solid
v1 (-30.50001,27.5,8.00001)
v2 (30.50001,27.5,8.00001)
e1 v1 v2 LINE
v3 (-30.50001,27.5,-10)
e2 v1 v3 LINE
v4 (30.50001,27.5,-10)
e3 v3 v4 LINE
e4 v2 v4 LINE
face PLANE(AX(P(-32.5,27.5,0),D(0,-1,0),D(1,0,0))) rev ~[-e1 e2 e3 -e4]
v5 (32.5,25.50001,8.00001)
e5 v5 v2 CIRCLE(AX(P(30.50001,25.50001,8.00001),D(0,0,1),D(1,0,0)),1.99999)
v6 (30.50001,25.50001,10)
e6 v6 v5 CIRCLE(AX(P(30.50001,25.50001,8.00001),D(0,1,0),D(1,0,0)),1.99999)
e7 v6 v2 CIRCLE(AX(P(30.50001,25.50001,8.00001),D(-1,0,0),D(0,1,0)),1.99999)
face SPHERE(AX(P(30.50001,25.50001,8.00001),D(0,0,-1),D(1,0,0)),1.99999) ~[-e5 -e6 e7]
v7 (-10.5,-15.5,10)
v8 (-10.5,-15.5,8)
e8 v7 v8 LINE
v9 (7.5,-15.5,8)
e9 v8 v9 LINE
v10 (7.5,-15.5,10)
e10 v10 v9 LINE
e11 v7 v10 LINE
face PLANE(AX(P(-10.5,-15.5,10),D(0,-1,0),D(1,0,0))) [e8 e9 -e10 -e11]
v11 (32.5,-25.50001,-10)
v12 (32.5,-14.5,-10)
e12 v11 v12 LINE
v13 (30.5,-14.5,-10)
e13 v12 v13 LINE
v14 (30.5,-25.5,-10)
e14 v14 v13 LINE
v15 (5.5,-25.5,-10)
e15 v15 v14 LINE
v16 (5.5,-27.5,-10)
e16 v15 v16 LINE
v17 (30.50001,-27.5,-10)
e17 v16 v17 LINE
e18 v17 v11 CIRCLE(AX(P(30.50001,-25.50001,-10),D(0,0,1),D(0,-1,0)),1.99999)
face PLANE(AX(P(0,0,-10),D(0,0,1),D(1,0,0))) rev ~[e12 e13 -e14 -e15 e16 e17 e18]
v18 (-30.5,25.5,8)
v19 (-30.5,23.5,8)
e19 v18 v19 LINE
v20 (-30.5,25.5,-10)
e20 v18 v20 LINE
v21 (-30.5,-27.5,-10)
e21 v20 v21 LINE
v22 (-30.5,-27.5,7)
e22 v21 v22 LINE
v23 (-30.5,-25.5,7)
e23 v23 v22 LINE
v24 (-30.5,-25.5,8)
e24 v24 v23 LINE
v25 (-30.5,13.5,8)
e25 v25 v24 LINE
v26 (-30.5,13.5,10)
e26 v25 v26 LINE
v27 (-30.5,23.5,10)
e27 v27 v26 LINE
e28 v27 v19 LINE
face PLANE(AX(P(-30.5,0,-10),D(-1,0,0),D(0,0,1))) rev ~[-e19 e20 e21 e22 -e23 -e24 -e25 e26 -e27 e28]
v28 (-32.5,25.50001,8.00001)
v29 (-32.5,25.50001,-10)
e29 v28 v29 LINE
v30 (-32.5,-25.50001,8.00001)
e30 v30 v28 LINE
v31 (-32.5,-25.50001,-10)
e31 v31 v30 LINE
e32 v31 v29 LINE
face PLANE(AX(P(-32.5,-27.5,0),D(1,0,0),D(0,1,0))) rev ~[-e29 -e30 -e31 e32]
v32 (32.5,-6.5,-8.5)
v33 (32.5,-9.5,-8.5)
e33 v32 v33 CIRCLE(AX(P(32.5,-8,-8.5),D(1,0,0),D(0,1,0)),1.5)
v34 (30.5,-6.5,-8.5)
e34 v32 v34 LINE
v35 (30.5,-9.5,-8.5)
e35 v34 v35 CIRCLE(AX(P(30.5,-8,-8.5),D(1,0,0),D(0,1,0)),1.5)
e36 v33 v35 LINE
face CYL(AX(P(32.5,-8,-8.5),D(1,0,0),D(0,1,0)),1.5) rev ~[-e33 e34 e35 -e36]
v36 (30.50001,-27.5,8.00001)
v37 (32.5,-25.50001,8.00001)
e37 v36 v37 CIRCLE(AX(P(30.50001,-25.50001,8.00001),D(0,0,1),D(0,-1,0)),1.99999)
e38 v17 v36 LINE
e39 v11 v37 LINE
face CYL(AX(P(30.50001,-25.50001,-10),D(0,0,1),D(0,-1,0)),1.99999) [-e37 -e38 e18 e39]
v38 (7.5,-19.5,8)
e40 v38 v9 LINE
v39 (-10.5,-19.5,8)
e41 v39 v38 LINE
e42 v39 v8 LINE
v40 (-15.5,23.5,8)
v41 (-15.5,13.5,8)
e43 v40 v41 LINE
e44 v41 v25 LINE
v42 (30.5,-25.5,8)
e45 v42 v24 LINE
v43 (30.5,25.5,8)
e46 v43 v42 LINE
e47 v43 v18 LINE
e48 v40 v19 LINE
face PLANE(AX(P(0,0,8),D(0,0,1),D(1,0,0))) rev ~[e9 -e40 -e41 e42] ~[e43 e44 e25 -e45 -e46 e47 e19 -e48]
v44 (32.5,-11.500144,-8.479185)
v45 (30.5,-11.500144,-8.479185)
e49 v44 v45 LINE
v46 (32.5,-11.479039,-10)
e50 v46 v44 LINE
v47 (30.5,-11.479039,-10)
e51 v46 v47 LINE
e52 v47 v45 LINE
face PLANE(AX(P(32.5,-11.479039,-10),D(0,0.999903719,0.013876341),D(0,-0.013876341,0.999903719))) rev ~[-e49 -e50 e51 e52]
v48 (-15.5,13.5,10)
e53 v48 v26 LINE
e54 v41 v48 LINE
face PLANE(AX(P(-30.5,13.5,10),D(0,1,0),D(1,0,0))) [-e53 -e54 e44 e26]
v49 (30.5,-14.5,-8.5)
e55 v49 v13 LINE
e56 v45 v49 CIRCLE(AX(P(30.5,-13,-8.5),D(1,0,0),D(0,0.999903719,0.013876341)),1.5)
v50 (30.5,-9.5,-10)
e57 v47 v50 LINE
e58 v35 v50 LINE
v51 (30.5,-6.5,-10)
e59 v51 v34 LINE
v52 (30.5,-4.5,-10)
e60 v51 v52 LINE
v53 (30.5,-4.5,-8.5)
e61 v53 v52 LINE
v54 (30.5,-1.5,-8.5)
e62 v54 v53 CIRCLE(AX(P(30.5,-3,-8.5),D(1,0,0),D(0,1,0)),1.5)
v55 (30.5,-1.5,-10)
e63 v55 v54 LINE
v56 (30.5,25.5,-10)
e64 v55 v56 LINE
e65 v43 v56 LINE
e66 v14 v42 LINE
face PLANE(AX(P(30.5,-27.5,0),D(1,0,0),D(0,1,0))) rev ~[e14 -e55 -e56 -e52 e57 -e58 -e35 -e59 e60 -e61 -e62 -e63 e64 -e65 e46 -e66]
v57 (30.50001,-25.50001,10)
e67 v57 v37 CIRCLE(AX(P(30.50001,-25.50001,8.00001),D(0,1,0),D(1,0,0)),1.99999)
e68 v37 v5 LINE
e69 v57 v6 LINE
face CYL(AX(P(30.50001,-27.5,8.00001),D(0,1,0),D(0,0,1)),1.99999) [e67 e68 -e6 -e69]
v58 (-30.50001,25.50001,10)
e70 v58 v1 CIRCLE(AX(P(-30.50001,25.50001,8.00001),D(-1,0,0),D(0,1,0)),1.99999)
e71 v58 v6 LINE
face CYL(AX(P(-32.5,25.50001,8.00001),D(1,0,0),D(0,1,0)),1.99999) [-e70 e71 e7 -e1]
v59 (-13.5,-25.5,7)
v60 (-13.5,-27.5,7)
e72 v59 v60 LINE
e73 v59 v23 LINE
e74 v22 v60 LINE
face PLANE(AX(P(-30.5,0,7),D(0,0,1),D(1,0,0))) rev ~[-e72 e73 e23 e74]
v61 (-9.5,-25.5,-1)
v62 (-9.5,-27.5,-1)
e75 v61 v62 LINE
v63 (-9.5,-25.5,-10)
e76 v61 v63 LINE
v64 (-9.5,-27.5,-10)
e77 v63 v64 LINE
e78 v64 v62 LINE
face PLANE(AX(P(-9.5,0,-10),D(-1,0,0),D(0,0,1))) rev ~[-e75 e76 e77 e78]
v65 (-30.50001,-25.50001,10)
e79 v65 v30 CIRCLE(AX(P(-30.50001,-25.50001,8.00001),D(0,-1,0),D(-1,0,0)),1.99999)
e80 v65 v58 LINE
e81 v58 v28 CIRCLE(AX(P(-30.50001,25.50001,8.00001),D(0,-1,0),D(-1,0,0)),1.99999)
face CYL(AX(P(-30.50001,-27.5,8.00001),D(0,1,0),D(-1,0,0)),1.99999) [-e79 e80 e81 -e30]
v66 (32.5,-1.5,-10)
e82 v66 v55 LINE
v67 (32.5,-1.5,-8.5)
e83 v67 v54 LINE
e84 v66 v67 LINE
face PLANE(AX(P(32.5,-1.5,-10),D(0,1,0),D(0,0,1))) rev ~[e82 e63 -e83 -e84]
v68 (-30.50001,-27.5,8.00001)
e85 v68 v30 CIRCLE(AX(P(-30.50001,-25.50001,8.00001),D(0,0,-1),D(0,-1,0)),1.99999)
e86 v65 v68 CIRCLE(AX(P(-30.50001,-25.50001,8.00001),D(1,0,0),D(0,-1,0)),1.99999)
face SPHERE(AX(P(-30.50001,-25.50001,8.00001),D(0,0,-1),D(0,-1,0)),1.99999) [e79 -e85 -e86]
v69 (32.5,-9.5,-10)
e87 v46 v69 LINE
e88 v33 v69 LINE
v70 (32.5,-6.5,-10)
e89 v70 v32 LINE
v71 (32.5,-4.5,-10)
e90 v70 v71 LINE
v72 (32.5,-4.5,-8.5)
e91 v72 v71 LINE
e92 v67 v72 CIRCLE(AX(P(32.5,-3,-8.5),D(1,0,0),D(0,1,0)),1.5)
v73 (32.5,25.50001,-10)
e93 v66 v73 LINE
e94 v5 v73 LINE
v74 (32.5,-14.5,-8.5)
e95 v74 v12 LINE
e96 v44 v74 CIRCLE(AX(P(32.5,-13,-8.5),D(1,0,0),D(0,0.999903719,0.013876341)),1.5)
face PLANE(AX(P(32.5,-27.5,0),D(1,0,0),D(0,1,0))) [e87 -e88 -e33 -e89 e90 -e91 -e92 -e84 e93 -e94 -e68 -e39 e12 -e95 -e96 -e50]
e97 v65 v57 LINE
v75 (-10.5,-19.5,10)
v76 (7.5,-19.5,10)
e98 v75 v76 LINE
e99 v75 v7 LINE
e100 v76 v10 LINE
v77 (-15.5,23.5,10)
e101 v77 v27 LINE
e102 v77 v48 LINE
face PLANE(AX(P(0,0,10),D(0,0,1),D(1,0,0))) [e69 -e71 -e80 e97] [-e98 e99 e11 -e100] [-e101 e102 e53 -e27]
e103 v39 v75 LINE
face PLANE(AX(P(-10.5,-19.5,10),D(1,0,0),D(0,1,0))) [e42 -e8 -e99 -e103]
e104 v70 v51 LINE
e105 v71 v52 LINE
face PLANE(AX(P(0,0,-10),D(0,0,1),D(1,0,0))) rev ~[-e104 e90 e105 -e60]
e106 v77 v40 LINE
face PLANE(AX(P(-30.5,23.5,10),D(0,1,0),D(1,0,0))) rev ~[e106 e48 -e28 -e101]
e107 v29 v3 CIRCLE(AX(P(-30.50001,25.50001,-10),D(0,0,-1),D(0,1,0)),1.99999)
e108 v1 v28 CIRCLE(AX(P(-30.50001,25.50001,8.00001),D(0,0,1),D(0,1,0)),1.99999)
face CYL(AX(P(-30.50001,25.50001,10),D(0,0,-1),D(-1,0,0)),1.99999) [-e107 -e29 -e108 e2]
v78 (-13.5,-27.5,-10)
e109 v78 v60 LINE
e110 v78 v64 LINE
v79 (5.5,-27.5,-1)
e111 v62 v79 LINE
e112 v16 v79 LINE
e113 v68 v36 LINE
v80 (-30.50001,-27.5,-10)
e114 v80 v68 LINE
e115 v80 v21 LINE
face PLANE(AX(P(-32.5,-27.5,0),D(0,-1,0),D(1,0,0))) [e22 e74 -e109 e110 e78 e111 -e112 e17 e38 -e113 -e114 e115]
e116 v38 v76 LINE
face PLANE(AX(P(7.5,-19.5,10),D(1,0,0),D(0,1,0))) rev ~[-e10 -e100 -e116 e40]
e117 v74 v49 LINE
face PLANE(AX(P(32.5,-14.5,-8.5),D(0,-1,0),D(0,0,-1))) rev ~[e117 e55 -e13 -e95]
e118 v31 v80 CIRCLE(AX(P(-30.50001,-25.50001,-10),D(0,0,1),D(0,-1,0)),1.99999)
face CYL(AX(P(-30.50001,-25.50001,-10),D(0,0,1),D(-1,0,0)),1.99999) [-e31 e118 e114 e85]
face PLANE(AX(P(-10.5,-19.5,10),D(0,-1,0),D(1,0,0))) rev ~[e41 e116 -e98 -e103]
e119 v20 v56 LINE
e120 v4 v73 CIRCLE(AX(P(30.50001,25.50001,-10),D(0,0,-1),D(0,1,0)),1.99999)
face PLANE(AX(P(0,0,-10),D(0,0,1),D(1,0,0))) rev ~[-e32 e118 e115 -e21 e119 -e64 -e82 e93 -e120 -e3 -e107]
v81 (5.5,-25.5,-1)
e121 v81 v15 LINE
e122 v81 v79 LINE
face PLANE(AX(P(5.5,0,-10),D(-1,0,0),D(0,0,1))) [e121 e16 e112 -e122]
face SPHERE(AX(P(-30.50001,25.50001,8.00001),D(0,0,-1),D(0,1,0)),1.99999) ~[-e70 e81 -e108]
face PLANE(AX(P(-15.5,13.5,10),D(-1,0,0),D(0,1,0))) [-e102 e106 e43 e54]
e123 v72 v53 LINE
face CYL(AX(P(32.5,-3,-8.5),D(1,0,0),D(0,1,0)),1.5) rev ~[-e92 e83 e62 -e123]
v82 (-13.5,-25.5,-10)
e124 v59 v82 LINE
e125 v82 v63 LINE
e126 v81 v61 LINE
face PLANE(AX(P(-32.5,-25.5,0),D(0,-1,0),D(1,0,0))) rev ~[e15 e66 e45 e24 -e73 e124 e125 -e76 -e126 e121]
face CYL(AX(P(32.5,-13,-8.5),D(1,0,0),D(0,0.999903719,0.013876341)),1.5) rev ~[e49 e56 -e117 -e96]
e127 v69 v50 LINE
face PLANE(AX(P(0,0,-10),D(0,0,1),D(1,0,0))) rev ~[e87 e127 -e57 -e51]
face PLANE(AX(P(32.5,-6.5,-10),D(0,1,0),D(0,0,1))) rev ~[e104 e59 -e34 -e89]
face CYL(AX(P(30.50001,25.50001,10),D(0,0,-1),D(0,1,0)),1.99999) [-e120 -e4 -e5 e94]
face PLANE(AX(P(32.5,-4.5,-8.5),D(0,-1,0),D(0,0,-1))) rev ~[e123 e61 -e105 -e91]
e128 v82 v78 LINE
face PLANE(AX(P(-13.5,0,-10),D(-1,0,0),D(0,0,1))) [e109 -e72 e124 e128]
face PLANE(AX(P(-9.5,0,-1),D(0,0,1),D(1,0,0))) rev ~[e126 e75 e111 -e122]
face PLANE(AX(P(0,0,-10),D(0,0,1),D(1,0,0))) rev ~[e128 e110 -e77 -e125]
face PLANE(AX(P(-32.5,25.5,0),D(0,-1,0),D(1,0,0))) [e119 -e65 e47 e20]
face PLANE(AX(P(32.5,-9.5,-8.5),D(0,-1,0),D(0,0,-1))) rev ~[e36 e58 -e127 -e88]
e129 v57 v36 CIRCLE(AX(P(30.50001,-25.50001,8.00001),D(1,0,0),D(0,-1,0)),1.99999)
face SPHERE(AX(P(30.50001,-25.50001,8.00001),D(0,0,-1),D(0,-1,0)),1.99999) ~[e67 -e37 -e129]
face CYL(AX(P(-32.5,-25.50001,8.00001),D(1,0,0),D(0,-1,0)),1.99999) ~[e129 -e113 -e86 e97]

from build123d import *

# Parameters (mm, degrees)
F0_W     = 65
F0_H     = 55
F1_DEPTH = 10
F2_T     = -2
F3_W     = 17
F3_H     = 17
F3_W_2   = 15
F3_H_2   = 9
F4_DEPTH = 27.5
F6_DEPTH = 25.4
F7_W     = 15
F7_H     = 10
F7_W_2   = 18
F7_H_2   = 4
F8_DEPTH = 12.7
F9_R     = 1.99999


# Not quite as in the source:
# - a fillet or chamfer is up to 0.001 mm smaller than in the source, because OpenCascade refuses the exact size


with BuildPart() as f1:
    # F0 (on Top) → F1 (new body, symmetric)
    with BuildSketch(Plane.XY):
        Rectangle(F0_W, F0_H)
    extrude(amount=F1_DEPTH, both=True)

    # F2
    f2_openings = [f1.faces().sort_by_distance(p)[0] for p in [
        (0, 0, -10),
    ]]
    offset(amount=F2_T, openings=f2_openings)

    # F3 (on Front) → F4 (cut, through all)
    with BuildSketch(Plane.XZ):
        with Locations((-22, -1.5)):
            Rectangle(F3_W, F3_H)
        with Locations((-2, -5.5)):
            Rectangle(F3_W_2, F3_H_2)
    extrude(amount=F4_DEPTH, mode=Mode.SUBTRACT)

    # F5 (on face) → F6 (cut)
    with BuildSketch(Plane.YZ.offset(32.5)):
        with BuildLine():
            Line((-14.5, -10), (-13, -10))
            ThreePointArc((-13, -10), (-14.0606601718, -9.5606601718), (-14.5, -8.5))
            Line((-14.5, -8.5), (-14.5, -10))
        make_face()
        with BuildLine():
            ThreePointArc((-13, -10), (-11.9393398282, -9.5606601718), (-11.5, -8.5))
            ThreePointArc((-11.5, -8.5), (-11.5000361058, -8.4895924938), (-11.5001444216, -8.4791854886))
            ThreePointArc((-11.5001444216, -8.4791854886), (-13.0104075062, -7.0000361058), (-14.5, -8.5))
            ThreePointArc((-14.5, -8.5), (-14.0606601718, -9.5606601718), (-13, -10))
        make_face()
        with BuildLine():
            ThreePointArc((-11.5001444216, -8.4791854886), (-11.5000361058, -8.4895924938), (-11.5, -8.5))
            ThreePointArc((-11.5, -8.5), (-11.9393398282, -9.5606601718), (-13, -10))
            Line((-13, -10), (-11.4790390489, -10))
            Line((-11.4790390489, -10), (-11.5001444216, -8.4791854886))
        make_face()
        with BuildLine():
            ThreePointArc((-6.5, -8.5), (-8, -7), (-9.5, -8.5))
            ThreePointArc((-9.5, -8.5), (-9.0606601747, -9.5606601688), (-8.0000000084, -10))
            ThreePointArc((-8.0000000084, -10), (-6.9393398312, -9.5606601747), (-6.5, -8.5))
        make_face()
        with BuildLine():
            Line((-9.5, -8.5), (-9.5, -10))
            Line((-9.5, -10), (-8.0000000084, -10))
            ThreePointArc((-8.0000000084, -10), (-9.0606601747, -9.5606601688), (-9.5, -8.5))
        make_face()
        with BuildLine():
            ThreePointArc((-6.5, -8.5), (-6.9393398312, -9.5606601747), (-8.0000000084, -10))
            Line((-8.0000000084, -10), (-6.5, -10))
            Line((-6.5, -10), (-6.5, -8.5))
        make_face()
        with BuildLine():
            ThreePointArc((-1.5, -8.5), (-3, -7), (-4.5, -8.5))
            ThreePointArc((-4.5, -8.5), (-4.0606601718, -9.5606601718), (-3, -10))
            ThreePointArc((-3, -10), (-1.9393398282, -9.5606601718), (-1.5, -8.5))
        make_face()
        with BuildLine():
            Line((-4.5, -8.5), (-4.5, -10))
            Line((-4.5, -10), (-3, -10))
            ThreePointArc((-3, -10), (-4.0606601718, -9.5606601718), (-4.5, -8.5))
        make_face()
        with BuildLine():
            ThreePointArc((-1.5, -8.5), (-1.9393398282, -9.5606601718), (-3, -10))
            Line((-3, -10), (-1.5, -10))
            Line((-1.5, -10), (-1.5, -8.5))
        make_face()
    extrude(amount=-F6_DEPTH, mode=Mode.SUBTRACT)

    # F7 (on face) → F8 (cut, symmetric)
    with BuildSketch(Plane.XY.offset(10)):
        with Locations((-23, 18.5)):
            Rectangle(F7_W, F7_H)
        with Locations((-1.5, -17.5)):
            Rectangle(F7_W_2, F7_H_2)
    extrude(amount=F8_DEPTH, both=True, mode=Mode.SUBTRACT)

    # F9 (radius 2 in the source; OpenCascade refuses exactly that, so slightly less here)
    f9_edges = [f1.edges().sort_by_distance(p)[0] for p in [
        (-32.5, -27.5, 0),
        (32.5, -27.5, 0),
        (32.5, 27.5, 0),
        (-32.5, 27.5, 0),
        (0, -27.5, 10),
        (32.5, 0, 10),
        (0, 27.5, 10),
        (-32.5, 0, 10),
    ]]
    fillet(f9_edges, radius=F9_R)


solid = f1.part
